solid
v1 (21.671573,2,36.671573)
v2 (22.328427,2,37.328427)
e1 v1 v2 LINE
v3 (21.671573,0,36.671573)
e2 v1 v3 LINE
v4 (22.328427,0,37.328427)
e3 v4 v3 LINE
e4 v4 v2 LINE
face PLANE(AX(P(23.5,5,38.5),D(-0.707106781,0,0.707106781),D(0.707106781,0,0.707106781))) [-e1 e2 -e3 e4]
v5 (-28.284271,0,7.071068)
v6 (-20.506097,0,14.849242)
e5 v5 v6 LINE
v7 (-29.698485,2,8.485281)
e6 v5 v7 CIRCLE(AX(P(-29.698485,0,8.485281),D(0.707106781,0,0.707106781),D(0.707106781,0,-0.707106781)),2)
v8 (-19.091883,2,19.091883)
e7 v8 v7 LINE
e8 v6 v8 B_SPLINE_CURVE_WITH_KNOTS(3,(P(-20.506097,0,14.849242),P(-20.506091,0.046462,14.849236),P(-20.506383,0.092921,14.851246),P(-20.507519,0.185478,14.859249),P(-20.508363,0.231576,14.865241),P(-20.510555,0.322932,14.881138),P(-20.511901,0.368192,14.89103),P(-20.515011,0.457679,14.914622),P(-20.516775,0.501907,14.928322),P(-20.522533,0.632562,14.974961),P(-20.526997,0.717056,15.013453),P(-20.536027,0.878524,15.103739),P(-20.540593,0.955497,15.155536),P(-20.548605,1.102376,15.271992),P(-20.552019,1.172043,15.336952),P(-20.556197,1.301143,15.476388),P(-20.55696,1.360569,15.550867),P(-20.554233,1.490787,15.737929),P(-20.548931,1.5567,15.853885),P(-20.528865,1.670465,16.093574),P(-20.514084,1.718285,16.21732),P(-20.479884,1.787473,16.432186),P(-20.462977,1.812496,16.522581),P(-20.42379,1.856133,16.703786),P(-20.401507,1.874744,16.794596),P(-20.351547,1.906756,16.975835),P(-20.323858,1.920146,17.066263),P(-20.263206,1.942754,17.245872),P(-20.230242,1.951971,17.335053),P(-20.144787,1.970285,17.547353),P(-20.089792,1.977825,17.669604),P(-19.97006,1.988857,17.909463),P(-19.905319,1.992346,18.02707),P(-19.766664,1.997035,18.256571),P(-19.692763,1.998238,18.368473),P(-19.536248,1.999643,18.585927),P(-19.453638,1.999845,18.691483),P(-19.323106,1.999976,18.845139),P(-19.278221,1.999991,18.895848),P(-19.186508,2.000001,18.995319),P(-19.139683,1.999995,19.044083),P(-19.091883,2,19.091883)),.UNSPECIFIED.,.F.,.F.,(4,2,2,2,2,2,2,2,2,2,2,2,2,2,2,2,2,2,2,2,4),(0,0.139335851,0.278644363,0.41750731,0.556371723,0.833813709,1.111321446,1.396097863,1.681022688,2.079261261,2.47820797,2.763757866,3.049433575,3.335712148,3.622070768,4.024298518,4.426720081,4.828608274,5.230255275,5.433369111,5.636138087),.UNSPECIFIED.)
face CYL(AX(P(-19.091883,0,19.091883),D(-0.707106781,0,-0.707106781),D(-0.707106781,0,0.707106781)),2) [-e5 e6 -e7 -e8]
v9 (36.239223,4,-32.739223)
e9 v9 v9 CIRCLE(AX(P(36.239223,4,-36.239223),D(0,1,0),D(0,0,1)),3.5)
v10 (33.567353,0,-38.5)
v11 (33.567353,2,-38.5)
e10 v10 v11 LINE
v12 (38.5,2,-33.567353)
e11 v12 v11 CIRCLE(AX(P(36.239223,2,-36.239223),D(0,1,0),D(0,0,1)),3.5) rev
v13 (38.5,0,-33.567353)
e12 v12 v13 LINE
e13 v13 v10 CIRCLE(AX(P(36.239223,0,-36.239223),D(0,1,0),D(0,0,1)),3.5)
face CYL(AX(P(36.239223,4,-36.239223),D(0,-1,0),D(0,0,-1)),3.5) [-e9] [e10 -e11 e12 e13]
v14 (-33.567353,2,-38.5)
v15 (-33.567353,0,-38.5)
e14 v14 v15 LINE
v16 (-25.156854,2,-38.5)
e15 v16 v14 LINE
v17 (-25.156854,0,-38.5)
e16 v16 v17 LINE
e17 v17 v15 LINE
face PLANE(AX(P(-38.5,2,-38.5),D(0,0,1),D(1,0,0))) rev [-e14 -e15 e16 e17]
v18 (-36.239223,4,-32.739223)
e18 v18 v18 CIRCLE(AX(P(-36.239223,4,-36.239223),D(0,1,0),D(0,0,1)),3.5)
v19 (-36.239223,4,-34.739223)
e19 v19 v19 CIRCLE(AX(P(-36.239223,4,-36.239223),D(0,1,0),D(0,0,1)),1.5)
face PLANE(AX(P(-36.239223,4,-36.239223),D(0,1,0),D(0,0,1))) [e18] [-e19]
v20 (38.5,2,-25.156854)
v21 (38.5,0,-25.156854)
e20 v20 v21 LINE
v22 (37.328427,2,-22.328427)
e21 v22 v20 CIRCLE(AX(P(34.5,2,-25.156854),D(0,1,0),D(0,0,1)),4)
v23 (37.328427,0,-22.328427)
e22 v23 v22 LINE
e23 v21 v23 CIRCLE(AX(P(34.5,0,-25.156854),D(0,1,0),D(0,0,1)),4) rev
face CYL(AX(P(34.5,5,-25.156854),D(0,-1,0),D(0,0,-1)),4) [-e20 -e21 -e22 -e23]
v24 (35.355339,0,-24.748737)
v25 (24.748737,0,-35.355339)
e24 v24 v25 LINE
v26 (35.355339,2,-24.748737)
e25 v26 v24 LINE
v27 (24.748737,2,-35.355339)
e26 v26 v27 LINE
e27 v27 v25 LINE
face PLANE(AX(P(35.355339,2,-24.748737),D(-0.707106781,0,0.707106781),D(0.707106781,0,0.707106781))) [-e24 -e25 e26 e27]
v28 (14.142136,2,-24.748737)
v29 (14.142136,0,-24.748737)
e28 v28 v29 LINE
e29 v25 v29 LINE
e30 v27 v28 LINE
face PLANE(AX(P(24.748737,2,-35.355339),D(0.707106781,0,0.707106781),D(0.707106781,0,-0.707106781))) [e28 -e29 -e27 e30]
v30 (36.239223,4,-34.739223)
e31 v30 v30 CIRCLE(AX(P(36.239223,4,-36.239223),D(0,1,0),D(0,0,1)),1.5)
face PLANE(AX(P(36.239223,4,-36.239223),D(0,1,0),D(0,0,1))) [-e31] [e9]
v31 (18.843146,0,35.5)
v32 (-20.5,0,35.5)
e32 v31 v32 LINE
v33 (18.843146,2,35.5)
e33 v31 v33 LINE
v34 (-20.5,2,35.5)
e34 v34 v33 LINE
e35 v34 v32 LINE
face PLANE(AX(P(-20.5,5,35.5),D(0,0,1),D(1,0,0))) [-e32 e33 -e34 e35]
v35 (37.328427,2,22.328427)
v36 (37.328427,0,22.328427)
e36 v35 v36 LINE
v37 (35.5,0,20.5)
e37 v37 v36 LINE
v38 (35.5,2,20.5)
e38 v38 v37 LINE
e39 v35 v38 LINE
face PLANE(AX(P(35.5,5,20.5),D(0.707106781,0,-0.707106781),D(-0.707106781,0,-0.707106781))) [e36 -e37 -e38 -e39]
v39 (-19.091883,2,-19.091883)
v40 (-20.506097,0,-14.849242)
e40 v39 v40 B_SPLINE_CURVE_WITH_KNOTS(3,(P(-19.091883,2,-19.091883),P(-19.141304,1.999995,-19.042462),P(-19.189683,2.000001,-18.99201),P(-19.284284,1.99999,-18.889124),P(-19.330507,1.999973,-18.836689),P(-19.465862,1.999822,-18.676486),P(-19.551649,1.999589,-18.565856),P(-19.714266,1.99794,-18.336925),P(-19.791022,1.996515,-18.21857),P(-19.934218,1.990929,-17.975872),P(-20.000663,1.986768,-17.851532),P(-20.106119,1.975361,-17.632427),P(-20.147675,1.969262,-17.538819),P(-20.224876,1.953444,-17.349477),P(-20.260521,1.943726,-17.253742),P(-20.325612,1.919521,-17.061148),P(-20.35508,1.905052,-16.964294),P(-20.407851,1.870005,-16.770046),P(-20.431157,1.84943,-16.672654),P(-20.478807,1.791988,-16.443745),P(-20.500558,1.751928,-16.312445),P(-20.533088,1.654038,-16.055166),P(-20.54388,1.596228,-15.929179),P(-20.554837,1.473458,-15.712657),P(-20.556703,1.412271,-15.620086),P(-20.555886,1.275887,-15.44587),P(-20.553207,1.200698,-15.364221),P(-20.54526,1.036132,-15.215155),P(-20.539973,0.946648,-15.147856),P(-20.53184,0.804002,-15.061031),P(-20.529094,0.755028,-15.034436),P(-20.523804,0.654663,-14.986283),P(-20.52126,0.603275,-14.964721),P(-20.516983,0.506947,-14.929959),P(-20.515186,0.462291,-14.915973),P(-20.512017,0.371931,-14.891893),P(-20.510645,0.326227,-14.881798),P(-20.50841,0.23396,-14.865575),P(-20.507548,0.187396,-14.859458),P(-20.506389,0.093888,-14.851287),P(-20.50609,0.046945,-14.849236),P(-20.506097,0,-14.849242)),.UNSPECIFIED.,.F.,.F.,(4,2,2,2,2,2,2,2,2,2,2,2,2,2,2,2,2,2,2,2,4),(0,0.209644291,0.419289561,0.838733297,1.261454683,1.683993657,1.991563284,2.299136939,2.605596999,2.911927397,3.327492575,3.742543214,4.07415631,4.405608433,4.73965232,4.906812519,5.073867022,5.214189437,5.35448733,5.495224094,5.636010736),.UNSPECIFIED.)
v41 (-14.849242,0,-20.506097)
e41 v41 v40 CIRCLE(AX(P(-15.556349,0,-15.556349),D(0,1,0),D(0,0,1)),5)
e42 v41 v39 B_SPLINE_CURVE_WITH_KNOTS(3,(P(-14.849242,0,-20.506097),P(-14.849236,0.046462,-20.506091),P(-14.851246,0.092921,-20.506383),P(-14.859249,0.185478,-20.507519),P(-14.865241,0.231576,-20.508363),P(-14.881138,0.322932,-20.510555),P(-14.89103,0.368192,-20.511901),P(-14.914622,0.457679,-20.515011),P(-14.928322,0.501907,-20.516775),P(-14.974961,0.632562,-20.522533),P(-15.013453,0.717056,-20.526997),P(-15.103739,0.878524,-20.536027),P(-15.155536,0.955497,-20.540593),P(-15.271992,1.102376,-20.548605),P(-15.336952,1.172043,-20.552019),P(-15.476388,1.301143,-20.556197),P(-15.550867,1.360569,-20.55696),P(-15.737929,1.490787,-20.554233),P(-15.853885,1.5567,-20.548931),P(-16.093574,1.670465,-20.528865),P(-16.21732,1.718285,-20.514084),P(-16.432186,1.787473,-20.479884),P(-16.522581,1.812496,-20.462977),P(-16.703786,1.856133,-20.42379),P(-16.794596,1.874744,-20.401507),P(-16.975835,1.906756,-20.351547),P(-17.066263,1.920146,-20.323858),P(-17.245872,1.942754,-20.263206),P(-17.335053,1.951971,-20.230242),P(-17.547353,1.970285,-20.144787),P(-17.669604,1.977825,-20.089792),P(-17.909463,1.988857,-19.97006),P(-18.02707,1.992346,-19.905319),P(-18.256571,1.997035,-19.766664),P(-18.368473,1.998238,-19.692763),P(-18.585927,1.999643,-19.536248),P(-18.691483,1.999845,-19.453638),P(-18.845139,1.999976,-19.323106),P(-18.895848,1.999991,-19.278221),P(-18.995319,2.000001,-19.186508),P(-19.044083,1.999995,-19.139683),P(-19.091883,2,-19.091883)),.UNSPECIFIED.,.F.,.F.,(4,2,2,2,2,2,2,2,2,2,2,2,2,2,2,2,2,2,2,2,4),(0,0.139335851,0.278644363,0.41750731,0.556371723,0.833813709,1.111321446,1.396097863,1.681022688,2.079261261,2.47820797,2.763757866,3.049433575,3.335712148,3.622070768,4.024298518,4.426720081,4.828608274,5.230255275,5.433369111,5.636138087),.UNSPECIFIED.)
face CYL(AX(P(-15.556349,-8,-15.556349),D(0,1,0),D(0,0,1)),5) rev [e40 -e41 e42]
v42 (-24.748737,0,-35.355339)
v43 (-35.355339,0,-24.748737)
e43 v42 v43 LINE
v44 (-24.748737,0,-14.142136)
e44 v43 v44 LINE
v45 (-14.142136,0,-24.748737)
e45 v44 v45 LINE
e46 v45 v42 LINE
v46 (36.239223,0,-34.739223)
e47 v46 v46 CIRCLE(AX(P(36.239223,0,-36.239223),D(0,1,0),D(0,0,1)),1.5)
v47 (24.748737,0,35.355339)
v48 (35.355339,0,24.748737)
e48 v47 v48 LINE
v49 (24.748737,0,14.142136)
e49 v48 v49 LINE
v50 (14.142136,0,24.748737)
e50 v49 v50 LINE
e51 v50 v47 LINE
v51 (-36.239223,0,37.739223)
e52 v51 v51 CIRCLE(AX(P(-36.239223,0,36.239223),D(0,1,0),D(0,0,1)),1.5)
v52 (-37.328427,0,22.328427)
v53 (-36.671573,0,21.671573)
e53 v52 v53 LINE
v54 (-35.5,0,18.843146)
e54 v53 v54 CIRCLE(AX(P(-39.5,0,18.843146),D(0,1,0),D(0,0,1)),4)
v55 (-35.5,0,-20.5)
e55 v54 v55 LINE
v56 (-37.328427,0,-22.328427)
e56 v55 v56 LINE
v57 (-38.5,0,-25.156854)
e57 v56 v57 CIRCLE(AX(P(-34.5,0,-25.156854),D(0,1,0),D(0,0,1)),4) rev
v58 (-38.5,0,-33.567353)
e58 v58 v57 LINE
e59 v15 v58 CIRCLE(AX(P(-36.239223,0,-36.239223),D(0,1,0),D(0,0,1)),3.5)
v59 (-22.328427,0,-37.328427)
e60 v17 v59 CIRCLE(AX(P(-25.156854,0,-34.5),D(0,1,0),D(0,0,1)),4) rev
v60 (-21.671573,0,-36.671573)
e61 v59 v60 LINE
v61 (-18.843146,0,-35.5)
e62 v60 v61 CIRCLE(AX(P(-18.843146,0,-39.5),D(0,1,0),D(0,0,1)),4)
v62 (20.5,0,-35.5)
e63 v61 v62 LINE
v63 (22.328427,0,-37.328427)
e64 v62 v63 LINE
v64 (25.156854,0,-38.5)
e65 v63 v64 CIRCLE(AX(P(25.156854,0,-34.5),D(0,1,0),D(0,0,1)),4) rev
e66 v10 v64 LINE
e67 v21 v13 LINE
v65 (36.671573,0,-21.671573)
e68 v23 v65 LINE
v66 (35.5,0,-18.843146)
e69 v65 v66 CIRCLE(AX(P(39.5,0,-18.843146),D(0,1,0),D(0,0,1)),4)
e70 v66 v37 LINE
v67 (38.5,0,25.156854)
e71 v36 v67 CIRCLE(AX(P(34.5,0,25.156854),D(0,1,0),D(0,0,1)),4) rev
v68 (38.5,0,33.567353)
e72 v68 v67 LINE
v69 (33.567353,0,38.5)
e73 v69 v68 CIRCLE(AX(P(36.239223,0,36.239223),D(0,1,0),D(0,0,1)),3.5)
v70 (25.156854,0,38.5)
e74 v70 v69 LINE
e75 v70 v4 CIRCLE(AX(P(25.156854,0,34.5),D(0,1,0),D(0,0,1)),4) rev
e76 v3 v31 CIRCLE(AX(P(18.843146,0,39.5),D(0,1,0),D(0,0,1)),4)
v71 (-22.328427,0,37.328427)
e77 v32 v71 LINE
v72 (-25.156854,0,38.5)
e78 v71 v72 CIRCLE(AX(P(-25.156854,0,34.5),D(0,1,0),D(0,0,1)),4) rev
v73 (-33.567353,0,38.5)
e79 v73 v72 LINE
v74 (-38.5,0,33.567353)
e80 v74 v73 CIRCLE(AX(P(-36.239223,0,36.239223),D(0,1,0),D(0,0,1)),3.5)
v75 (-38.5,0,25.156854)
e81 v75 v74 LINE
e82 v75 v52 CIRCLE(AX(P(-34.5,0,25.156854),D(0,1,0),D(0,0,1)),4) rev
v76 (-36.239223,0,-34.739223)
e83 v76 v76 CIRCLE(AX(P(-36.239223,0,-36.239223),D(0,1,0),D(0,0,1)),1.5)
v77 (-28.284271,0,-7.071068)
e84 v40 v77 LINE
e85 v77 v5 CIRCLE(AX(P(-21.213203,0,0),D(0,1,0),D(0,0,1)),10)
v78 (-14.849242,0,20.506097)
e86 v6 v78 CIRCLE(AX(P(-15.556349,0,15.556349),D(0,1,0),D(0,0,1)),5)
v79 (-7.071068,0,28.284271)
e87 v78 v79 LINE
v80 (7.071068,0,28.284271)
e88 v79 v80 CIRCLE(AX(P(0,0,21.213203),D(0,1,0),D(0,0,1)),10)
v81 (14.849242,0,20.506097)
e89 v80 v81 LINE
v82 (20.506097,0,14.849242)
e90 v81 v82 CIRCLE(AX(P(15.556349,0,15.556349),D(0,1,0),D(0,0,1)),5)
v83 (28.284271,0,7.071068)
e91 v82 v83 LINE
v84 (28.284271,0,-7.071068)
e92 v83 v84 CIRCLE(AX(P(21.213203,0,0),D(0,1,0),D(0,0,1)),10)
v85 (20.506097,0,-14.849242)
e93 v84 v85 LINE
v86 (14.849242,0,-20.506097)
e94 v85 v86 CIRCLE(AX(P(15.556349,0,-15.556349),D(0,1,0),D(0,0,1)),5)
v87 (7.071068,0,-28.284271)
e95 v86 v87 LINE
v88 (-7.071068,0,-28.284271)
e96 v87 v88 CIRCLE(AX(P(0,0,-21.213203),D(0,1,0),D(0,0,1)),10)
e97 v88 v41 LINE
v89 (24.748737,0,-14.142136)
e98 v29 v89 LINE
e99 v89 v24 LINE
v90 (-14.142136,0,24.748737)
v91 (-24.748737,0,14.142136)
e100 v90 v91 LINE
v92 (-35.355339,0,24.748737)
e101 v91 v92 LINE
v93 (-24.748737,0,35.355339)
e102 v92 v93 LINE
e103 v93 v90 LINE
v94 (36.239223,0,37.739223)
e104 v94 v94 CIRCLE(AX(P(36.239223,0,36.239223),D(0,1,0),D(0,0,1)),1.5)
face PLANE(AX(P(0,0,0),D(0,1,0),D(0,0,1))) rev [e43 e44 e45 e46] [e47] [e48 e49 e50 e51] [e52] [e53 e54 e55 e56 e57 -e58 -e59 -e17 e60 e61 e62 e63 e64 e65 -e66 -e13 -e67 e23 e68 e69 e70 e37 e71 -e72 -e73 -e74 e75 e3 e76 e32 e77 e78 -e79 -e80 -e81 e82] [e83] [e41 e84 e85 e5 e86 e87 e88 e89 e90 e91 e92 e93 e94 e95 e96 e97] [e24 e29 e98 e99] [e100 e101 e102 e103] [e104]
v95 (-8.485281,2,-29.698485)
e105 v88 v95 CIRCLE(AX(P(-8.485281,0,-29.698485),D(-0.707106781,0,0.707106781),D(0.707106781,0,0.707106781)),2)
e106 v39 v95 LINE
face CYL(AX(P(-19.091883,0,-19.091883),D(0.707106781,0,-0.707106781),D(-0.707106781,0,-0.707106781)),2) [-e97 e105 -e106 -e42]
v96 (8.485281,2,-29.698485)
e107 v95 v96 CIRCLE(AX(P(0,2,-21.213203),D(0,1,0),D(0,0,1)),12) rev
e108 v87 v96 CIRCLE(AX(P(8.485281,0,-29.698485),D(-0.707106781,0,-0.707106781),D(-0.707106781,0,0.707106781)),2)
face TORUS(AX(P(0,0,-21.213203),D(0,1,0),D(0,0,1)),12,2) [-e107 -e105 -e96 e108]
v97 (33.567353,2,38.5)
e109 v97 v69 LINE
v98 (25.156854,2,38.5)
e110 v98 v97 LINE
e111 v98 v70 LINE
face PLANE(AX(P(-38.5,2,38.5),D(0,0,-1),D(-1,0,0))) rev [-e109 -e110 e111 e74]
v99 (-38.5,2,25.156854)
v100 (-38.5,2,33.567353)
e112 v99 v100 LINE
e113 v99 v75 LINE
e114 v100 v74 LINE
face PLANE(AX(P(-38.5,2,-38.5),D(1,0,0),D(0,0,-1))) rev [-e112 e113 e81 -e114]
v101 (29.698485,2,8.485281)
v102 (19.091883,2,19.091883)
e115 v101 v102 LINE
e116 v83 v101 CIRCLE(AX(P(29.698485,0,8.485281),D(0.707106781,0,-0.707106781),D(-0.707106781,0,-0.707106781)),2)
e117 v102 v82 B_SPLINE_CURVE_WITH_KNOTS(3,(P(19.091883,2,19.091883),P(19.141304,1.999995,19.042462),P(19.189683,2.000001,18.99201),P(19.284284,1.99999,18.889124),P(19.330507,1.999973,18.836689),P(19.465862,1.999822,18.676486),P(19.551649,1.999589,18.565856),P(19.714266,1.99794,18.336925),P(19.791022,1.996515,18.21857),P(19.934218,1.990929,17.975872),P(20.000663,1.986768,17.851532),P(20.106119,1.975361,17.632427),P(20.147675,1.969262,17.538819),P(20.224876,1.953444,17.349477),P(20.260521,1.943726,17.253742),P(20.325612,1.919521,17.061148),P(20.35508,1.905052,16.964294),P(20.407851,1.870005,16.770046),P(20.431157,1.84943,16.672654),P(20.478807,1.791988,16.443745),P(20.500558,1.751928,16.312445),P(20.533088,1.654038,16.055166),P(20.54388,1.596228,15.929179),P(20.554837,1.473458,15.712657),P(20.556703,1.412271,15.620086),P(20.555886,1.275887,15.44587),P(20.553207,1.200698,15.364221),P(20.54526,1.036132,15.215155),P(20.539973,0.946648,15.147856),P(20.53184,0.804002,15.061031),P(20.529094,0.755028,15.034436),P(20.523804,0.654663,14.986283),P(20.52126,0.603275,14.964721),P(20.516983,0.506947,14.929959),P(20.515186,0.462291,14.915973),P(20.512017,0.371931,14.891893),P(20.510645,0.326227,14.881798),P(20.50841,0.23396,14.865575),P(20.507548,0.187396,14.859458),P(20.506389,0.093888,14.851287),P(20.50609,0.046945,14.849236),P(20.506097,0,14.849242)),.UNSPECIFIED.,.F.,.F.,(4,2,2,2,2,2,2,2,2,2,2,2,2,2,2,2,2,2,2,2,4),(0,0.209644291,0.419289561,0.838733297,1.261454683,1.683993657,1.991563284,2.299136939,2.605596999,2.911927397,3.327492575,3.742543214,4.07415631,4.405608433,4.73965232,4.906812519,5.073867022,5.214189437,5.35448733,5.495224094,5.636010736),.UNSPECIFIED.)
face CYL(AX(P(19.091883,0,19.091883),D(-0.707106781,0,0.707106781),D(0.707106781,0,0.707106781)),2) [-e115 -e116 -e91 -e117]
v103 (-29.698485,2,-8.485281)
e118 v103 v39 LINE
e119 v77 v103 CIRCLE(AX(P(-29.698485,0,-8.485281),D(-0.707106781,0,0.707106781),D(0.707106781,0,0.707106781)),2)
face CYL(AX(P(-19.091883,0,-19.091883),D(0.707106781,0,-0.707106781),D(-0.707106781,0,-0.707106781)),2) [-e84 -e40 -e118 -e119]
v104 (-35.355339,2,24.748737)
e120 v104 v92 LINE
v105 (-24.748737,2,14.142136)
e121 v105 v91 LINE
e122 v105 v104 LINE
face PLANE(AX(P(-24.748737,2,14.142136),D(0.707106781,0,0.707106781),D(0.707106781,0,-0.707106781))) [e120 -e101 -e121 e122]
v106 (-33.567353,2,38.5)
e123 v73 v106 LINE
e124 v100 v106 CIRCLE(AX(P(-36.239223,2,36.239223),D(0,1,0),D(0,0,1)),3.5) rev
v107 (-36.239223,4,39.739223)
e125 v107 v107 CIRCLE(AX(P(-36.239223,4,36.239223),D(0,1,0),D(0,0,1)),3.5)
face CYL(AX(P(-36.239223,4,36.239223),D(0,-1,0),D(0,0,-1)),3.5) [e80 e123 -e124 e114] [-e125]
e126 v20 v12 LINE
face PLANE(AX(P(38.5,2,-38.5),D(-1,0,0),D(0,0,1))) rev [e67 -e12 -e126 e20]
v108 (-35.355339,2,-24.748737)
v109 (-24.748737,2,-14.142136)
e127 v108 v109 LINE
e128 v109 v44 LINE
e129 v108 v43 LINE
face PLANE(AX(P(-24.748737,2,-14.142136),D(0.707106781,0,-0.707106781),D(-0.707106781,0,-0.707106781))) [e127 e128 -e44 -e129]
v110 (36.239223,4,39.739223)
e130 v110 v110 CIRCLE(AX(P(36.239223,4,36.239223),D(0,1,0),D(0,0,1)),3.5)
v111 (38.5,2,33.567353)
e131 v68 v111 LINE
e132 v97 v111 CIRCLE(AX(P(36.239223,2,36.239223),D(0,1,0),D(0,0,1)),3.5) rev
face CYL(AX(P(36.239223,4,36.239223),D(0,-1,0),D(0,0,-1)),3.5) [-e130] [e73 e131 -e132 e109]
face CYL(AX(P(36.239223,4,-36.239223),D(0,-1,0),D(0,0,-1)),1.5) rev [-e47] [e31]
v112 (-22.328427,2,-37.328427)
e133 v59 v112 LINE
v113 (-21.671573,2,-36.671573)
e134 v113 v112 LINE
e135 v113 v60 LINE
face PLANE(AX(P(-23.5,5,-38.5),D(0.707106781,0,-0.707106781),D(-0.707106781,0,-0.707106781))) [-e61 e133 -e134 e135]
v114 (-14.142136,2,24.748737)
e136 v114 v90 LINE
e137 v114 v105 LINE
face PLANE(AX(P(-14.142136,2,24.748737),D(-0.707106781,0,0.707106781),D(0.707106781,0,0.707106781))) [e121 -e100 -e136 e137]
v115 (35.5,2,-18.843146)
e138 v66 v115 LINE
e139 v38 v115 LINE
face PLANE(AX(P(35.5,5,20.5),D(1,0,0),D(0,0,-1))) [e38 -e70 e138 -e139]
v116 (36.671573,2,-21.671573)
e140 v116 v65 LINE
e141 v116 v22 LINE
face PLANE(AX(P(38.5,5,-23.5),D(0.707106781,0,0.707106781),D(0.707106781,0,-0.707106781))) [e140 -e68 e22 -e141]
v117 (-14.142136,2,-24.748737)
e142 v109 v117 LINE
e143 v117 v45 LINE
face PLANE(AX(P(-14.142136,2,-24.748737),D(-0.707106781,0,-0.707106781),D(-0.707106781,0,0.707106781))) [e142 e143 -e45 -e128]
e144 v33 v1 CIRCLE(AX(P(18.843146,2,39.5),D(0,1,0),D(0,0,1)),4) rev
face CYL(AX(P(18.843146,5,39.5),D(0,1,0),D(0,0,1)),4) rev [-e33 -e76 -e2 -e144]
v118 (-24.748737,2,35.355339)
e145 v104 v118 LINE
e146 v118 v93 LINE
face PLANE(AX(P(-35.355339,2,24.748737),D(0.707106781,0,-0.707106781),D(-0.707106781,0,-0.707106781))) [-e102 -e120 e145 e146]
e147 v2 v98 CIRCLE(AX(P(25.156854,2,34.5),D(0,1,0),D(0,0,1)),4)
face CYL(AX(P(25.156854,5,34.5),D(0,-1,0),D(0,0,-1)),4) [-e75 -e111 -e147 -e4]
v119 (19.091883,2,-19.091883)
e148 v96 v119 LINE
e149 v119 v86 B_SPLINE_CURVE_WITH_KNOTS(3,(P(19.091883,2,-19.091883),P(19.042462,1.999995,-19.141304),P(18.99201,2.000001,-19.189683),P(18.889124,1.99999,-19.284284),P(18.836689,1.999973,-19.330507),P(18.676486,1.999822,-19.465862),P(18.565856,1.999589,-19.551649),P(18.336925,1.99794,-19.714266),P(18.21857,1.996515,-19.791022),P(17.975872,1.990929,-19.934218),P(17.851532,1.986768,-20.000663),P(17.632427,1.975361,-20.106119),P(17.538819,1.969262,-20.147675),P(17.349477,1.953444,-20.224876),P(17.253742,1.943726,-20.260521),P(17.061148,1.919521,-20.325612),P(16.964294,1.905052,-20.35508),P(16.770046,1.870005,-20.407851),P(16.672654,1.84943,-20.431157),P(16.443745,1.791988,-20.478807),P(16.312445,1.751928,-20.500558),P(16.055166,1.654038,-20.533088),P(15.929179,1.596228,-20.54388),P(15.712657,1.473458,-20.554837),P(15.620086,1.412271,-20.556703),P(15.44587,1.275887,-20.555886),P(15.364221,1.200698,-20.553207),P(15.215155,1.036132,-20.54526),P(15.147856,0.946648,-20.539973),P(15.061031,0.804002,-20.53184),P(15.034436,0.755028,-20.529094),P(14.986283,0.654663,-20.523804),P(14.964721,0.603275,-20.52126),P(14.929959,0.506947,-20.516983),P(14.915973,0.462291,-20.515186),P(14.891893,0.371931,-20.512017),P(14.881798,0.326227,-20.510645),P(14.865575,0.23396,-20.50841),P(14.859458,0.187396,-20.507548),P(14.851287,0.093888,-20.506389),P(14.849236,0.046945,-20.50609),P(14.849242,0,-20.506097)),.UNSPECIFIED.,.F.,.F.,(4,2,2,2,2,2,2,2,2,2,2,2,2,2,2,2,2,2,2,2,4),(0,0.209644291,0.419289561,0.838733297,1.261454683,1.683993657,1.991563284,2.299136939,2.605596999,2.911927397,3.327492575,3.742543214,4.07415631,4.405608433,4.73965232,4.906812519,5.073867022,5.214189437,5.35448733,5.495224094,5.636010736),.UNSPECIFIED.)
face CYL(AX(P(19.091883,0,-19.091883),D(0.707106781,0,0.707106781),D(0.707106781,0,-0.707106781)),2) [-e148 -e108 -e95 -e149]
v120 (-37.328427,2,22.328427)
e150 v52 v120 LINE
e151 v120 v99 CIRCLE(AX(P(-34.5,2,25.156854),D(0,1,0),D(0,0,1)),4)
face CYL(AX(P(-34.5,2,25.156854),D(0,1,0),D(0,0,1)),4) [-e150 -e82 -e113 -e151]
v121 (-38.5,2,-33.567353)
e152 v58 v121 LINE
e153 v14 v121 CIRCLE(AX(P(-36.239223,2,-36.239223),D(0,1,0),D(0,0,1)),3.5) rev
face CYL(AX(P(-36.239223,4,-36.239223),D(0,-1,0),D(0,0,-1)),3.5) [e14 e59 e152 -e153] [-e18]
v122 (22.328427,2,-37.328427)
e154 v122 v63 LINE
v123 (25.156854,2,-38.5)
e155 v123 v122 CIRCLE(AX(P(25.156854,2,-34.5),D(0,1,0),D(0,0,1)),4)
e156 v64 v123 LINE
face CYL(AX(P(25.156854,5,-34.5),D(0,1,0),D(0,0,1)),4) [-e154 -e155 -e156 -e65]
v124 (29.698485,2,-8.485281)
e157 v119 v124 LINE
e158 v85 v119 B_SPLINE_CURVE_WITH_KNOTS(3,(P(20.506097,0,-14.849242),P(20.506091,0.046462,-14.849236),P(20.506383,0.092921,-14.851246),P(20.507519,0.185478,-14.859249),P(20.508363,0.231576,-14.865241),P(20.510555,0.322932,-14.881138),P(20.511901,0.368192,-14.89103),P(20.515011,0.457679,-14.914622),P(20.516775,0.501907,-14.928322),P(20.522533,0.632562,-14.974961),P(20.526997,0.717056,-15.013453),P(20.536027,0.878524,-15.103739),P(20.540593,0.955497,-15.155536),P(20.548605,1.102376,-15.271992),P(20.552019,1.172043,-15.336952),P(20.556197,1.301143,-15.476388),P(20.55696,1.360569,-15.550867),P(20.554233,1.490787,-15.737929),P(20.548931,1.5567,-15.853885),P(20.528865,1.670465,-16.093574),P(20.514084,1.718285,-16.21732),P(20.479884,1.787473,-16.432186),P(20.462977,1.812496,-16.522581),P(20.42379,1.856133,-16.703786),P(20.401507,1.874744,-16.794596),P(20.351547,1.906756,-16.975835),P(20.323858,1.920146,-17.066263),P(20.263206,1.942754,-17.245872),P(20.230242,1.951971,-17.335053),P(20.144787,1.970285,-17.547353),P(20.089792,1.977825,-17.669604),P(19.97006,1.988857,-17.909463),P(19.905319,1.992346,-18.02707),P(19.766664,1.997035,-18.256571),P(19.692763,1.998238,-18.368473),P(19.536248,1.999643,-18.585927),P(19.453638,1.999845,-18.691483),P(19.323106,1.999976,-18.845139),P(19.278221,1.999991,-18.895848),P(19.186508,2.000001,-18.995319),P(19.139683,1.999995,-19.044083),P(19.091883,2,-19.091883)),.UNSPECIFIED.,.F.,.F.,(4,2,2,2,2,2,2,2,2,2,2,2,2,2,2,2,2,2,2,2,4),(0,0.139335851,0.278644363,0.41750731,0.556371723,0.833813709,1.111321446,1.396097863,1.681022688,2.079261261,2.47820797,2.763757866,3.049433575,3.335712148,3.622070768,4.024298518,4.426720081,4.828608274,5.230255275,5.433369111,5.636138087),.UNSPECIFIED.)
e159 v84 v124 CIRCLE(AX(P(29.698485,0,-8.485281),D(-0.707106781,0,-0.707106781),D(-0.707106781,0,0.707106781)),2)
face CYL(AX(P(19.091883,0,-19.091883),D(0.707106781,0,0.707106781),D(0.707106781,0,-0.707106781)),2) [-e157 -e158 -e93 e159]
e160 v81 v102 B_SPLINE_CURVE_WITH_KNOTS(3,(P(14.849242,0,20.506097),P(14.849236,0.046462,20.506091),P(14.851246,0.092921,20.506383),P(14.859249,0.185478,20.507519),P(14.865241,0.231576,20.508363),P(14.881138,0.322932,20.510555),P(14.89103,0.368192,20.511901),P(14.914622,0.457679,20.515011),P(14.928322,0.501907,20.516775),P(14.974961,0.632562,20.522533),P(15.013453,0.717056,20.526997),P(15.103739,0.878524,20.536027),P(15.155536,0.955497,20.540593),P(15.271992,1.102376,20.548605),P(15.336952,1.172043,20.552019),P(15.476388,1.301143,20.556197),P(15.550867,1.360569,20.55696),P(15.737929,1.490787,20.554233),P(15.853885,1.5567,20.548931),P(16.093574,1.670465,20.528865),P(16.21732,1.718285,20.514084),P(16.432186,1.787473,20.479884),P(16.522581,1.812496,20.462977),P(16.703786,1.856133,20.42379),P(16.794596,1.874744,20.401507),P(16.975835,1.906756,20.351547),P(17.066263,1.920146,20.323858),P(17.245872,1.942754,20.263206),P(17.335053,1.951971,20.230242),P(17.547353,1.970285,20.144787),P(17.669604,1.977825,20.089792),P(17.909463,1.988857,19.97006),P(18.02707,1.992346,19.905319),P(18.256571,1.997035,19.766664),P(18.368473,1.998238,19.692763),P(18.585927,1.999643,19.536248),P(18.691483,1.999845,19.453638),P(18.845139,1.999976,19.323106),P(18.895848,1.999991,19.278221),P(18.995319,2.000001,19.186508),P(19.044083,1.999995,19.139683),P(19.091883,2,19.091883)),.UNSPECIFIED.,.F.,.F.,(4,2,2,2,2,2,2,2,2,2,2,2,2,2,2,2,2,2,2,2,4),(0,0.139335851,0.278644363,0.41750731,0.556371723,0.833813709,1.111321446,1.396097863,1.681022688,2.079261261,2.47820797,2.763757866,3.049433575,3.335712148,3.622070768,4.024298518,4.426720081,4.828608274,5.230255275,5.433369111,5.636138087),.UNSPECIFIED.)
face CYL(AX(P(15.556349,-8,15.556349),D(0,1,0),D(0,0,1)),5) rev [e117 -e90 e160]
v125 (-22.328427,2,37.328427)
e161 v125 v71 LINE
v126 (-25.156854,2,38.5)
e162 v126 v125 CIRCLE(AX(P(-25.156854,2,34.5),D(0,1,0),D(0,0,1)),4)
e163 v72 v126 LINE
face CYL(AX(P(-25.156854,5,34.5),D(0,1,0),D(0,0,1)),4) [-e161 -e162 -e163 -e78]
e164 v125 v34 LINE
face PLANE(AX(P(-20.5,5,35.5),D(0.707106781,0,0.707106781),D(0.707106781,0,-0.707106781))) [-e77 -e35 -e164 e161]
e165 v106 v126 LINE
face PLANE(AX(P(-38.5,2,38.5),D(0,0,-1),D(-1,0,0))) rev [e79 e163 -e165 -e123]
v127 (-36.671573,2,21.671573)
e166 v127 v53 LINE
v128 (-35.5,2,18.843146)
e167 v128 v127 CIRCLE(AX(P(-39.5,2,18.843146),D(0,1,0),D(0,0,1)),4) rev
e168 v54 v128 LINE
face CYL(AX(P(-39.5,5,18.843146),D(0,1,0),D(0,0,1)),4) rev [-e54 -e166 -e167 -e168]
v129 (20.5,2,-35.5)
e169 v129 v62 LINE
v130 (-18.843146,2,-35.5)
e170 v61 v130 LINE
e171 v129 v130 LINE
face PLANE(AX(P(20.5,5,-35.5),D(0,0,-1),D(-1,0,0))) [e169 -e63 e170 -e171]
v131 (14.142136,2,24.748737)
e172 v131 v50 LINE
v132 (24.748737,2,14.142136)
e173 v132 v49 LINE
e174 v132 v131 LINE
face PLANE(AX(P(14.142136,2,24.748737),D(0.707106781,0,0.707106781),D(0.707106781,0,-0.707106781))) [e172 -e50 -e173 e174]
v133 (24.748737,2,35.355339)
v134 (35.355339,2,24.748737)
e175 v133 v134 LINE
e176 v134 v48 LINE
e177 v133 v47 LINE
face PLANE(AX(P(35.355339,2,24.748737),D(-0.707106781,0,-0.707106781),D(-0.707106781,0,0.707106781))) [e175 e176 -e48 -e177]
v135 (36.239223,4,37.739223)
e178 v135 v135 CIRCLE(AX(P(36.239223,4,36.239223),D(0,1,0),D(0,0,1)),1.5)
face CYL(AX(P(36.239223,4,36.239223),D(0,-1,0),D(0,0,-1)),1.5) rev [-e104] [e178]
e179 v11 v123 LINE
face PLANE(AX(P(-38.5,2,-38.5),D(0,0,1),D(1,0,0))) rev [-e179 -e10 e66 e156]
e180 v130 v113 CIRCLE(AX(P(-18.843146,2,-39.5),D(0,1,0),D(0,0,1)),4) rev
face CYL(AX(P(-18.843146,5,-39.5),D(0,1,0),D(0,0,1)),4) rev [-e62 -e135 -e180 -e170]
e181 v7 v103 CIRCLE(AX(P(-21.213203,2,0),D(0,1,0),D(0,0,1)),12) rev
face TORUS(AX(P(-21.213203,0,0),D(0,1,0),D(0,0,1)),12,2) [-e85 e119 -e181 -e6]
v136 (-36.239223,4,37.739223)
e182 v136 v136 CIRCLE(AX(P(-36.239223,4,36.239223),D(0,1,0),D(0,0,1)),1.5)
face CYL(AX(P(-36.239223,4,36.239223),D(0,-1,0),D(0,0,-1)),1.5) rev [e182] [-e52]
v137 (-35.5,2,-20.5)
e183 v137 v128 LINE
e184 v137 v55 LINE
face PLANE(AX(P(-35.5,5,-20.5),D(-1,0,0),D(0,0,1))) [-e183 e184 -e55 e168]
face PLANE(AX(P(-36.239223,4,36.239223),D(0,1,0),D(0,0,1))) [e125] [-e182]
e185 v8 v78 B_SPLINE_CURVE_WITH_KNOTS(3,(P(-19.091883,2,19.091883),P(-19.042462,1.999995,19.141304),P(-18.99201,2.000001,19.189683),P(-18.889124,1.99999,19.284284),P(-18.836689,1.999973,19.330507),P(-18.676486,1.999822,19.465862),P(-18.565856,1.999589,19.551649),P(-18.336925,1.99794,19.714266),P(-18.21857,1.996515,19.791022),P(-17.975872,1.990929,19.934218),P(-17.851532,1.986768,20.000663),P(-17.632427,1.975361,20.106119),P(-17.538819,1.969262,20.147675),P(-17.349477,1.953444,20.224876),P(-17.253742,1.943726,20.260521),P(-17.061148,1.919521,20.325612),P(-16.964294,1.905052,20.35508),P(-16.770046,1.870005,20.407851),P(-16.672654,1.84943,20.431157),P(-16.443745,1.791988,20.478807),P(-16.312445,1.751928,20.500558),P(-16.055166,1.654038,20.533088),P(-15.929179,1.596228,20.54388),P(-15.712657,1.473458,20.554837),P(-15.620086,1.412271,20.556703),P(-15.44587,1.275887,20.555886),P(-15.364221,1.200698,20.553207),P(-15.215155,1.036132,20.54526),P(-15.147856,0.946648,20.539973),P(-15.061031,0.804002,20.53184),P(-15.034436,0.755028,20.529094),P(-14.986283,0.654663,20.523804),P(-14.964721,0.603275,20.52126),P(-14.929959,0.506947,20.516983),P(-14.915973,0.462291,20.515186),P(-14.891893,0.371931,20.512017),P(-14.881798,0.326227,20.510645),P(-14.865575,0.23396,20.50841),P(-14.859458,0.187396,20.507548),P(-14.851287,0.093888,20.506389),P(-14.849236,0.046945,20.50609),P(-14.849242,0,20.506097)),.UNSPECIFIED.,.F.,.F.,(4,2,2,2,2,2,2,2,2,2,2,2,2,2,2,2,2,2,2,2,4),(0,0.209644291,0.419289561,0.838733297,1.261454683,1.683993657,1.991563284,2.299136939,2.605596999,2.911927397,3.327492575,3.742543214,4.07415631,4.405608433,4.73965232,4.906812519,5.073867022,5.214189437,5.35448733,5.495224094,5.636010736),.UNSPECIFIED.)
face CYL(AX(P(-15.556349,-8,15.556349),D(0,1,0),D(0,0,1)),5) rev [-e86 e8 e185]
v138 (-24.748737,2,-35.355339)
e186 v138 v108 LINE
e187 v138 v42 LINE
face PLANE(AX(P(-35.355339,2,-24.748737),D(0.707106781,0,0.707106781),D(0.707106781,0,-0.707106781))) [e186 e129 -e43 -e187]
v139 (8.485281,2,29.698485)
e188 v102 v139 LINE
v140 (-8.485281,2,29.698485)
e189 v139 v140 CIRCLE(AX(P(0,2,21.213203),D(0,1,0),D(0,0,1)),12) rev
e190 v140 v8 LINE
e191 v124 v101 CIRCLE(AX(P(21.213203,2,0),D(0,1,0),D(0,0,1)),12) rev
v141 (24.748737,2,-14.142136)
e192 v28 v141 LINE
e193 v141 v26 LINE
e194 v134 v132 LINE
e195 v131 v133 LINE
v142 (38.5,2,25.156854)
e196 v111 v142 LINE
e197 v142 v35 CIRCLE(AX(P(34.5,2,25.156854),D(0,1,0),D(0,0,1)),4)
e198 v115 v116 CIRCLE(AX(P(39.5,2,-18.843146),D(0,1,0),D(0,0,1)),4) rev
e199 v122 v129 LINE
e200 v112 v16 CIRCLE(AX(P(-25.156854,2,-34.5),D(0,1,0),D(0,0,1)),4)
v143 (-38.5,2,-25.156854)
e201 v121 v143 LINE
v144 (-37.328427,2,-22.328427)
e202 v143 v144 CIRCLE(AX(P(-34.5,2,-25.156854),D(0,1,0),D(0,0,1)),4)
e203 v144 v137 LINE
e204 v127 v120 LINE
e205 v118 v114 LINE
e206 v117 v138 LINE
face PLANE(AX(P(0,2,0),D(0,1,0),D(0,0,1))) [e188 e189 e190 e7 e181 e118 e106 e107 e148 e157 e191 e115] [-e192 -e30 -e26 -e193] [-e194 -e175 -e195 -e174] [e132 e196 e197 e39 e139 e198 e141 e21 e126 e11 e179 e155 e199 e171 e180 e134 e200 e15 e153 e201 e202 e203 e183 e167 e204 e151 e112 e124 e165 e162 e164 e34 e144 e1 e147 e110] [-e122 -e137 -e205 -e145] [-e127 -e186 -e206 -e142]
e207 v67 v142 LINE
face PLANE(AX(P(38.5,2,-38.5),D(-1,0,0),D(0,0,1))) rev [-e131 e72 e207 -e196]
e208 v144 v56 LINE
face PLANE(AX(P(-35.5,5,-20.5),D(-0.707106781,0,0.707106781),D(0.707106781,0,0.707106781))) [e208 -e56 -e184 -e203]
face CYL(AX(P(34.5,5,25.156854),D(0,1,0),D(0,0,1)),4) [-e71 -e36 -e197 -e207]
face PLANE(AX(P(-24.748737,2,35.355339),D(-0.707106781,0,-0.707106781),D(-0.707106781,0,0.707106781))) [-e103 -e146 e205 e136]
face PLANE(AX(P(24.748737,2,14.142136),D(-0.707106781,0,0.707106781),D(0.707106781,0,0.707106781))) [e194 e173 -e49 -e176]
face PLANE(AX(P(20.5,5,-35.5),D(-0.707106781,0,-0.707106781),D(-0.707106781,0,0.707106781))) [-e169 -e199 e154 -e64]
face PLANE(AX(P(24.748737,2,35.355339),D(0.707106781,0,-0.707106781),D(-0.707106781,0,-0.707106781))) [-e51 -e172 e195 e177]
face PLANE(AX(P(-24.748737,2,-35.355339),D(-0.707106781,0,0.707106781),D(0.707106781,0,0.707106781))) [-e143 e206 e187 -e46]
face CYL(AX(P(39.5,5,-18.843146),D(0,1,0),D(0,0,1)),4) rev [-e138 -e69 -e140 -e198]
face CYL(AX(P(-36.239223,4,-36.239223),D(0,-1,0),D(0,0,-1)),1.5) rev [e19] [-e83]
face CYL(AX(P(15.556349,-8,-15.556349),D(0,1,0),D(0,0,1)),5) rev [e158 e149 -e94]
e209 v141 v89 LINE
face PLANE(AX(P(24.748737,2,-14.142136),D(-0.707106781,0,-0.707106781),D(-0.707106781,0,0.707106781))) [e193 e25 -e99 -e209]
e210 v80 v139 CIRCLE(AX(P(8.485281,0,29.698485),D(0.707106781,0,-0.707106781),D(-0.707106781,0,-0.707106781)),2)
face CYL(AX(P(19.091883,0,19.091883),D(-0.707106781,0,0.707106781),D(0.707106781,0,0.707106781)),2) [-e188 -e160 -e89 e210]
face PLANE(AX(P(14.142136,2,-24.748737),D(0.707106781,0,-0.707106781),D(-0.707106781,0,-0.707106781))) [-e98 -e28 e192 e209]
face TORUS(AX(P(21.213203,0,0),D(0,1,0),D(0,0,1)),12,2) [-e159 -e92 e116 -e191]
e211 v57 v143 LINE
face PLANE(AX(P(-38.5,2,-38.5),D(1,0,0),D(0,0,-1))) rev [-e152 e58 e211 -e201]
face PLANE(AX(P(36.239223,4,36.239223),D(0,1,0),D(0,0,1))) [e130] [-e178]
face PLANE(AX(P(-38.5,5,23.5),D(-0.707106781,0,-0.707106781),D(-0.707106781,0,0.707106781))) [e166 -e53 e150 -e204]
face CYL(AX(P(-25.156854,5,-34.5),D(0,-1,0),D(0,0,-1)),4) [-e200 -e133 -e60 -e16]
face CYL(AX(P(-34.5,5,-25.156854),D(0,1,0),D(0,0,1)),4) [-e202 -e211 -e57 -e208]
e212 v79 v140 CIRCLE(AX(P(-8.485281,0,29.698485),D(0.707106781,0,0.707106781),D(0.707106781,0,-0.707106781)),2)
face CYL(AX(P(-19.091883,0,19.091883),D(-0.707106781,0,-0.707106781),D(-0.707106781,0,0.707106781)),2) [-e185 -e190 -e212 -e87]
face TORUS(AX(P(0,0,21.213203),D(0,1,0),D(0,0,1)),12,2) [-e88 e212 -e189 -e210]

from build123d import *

# Parameters (mm, degrees)
SKETCH1_W           = 77
SKETCH1_H           = 77
BOSS_EXTRUDE1_DEPTH = 2
SKETCH3_R           = 3.5
BOSS_EXTRUDE2_DEPTH = 4
SKETCH5_R           = 1.5
CUT_EXTRUDE1_DEPTH  = 57.341917038
CUT_EXTRUDE3_DEPTH  = 5
CIRPATTERN3_COUNT   = 4
FILLET3_R           = 4
CUT_EXTRUDE5_DEPTH  = 5
SKETCH6_R           = 1.5
CUT_EXTRUDE6_DEPTH  = 57.341917038
FILLET4_R           = 10
SKETCH8_R           = 5
CUT_EXTRUDE7_DEPTH  = 10
FILLET5_R           = 2


with BuildPart() as part:
    # Sketch1 → Boss-Extrude1 (new body)
    with BuildSketch(Plane(origin=(0, 0, 0), x_dir=(1, 0, 0), z_dir=(0, 1, 0))):
        Rectangle(SKETCH1_W, SKETCH1_H)
        Polygon((14.142135624, 24.748737342), (24.748737342, 14.142135624), (35.355339059, 24.748737342), (24.748737342, 35.355339059), align=None, mode=Mode.SUBTRACT)
        Polygon((-24.748737342, 14.142135624), (-35.355339059, 24.748737342), (-24.748737342, 35.355339059), (-14.142135624, 24.748737342), align=None, mode=Mode.SUBTRACT)
        Polygon((-14.142135624, -24.748737342), (-24.748737342, -14.142135624), (-35.355339059, -24.748737342), (-24.748737342, -35.355339059), align=None, mode=Mode.SUBTRACT)
        Polygon((14.142135624, -24.748737342), (24.748737342, -14.142135624), (35.355339059, -24.748737342), (24.748737342, -35.355339059), align=None, mode=Mode.SUBTRACT)
    extrude(amount=BOSS_EXTRUDE1_DEPTH)

    # Sketch3 → Boss-Extrude2 (add)
    with BuildSketch(Plane(origin=(0, 0, 0), x_dir=(1, 0, 0), z_dir=(0, 1, 0))):
        with Locations(Location((-36.239222536, 36.239222536, 0), (0, 0, 40.235921257))):
            Circle(SKETCH3_R)
        with Locations(Location((36.239222536, 36.239222536, 0), (0, 0, 139.764078743))):
            Circle(SKETCH3_R)
        with Locations(Location((-36.239222536, -36.239222536, 0), (0, 0, 130.235921257))):
            Circle(SKETCH3_R)
        with Locations(Location((36.239222536, -36.239222536, 0), (0, 0, 49.764078743))):
            Circle(SKETCH3_R)
    extrude(amount=BOSS_EXTRUDE2_DEPTH)

    # Sketch5 → Cut-Extrude1 (cut, through all)
    with BuildSketch(Plane(origin=(0, 0, 0), x_dir=(1, 0, 0), z_dir=(0, 1, 0))):
        with Locations(Location((0, 0, 0), (0, 0, 270))):
            Circle(SKETCH5_R)
    extrude(amount=CUT_EXTRUDE1_DEPTH, mode=Mode.SUBTRACT)

    # Sketch4 → Cut-Extrude3 (cut)
    with BuildSketch(Plane(origin=(0, 0, 0), x_dir=(1, 0, 0), z_dir=(0, 1, 0))):
        Polygon((-38.5, 23.5), (-38.5, -23.5), (-35.5, -20.5), (-35.5, 20.5), align=None)
    cut_extrude3 = extrude(amount=CUT_EXTRUDE3_DEPTH, mode=Mode.SUBTRACT)

    # CirPattern3: Cut-Extrude3 ×4 about axis
    cirpattern3_axis = Axis((0, 0, 0), (0, 1, 0))
    for i in range(1, CIRPATTERN3_COUNT):
        add(cut_extrude3.rotate(cirpattern3_axis, i * 360 / CIRPATTERN3_COUNT), mode=Mode.SUBTRACT)

    # Fillet3
    fillet3_edges = [part.edges().sort_by_distance(p)[0] for p in [
        (-38.5, 1, -23.5),
        (-38.5, 1, 23.5),
        (-35.5, 1, 20.5),
        (-23.5, 1, -38.5),
        (23.5, 1, -38.5),
        (-20.5, 1, -35.5),
        (38.5, 1, -23.5),
        (38.5, 1, 23.5),
        (35.5, 1, -20.5),
        (23.5, 1, 38.5),
        (-23.5, 1, 38.5),
        (20.5, 1, 35.5),
    ]]
    fillet(fillet3_edges, radius=FILLET3_R)

    # Sketch2 → Cut-Extrude5 (cut)
    with BuildSketch(Plane(origin=(0, 0, 0), x_dir=(1, 0, 0), z_dir=(0, 1, 0))):
        Polygon((35.355339059, 0), (0, 35.355339059), (-35.355339059, 0), (0, -35.355339059), align=None)
    extrude(amount=CUT_EXTRUDE5_DEPTH, mode=Mode.SUBTRACT)

    # Sketch6 → Cut-Extrude6 (cut, through all)
    with BuildSketch(Plane(origin=(0, 0, 0), x_dir=(1, 0, 0), z_dir=(0, 1, 0))):
        with Locations(Location((-36.239222536, 36.239222536, 0), (0, 0, 270))):
            Circle(SKETCH6_R)
        with Locations(Location((-36.239222536, -36.239222536, 0), (0, 0, 270))):
            Circle(SKETCH6_R)
        with Locations(Location((36.239222536, -36.239222536, 0), (0, 0, 270))):
            Circle(SKETCH6_R)
        with Locations(Location((36.239222536, 36.239222536, 0), (0, 0, 270))):
            Circle(SKETCH6_R)
    extrude(amount=CUT_EXTRUDE6_DEPTH, mode=Mode.SUBTRACT)

    # Fillet4
    fillet4_edges = [part.edges().sort_by_distance(p)[0] for p in [
        (0, 1, 35.355339059),
        (35.355339059, 1, 0),
        (0, 1, -35.355339059),
        (-35.355339059, 1, 0),
    ]]
    fillet(fillet4_edges, radius=FILLET4_R)

    # Sketch8 → Cut-Extrude7 (cut)
    with BuildSketch(Plane(origin=(0, 2, 0), x_dir=(1, 0, 0), z_dir=(0, 1, 0))):
        with Locations((15.556349186, 15.556349186)):
            Circle(SKETCH8_R)
        with Locations((-15.556349186, 15.556349186)):
            Circle(SKETCH8_R)
        with Locations((-15.556349186, -15.556349186)):
            Circle(SKETCH8_R)
        with Locations((15.556349186, -15.556349186)):
            Circle(SKETCH8_R)
    extrude(amount=-CUT_EXTRUDE7_DEPTH, mode=Mode.SUBTRACT)

    # Fillet5
    fillet5_edges = [part.edges().sort_by_distance(p)[0] for p in [
        (-24.395183951, 2, 10.960155108),
        (-24.395183951, 2, -10.960155108),
        (10.960155108, 2, 24.395183951),
        (-10.960155108, 2, 24.395183951),
        (24.395183951, 2, -10.960155108),
        (24.395183951, 2, 10.960155108),
        (-10.960155108, 2, -24.395183951),
        (10.960155108, 2, -24.395183951),
        (-31.213203436, 2, 0),
        (0, 2, 31.213203436),
        (31.213203436, 2, 0),
        (0, 2, -31.213203436),
    ]]
    fillet(fillet5_edges, radius=FILLET5_R - 0.0001)  # a hair under: the kernel refuses the full size


solid = part.part
